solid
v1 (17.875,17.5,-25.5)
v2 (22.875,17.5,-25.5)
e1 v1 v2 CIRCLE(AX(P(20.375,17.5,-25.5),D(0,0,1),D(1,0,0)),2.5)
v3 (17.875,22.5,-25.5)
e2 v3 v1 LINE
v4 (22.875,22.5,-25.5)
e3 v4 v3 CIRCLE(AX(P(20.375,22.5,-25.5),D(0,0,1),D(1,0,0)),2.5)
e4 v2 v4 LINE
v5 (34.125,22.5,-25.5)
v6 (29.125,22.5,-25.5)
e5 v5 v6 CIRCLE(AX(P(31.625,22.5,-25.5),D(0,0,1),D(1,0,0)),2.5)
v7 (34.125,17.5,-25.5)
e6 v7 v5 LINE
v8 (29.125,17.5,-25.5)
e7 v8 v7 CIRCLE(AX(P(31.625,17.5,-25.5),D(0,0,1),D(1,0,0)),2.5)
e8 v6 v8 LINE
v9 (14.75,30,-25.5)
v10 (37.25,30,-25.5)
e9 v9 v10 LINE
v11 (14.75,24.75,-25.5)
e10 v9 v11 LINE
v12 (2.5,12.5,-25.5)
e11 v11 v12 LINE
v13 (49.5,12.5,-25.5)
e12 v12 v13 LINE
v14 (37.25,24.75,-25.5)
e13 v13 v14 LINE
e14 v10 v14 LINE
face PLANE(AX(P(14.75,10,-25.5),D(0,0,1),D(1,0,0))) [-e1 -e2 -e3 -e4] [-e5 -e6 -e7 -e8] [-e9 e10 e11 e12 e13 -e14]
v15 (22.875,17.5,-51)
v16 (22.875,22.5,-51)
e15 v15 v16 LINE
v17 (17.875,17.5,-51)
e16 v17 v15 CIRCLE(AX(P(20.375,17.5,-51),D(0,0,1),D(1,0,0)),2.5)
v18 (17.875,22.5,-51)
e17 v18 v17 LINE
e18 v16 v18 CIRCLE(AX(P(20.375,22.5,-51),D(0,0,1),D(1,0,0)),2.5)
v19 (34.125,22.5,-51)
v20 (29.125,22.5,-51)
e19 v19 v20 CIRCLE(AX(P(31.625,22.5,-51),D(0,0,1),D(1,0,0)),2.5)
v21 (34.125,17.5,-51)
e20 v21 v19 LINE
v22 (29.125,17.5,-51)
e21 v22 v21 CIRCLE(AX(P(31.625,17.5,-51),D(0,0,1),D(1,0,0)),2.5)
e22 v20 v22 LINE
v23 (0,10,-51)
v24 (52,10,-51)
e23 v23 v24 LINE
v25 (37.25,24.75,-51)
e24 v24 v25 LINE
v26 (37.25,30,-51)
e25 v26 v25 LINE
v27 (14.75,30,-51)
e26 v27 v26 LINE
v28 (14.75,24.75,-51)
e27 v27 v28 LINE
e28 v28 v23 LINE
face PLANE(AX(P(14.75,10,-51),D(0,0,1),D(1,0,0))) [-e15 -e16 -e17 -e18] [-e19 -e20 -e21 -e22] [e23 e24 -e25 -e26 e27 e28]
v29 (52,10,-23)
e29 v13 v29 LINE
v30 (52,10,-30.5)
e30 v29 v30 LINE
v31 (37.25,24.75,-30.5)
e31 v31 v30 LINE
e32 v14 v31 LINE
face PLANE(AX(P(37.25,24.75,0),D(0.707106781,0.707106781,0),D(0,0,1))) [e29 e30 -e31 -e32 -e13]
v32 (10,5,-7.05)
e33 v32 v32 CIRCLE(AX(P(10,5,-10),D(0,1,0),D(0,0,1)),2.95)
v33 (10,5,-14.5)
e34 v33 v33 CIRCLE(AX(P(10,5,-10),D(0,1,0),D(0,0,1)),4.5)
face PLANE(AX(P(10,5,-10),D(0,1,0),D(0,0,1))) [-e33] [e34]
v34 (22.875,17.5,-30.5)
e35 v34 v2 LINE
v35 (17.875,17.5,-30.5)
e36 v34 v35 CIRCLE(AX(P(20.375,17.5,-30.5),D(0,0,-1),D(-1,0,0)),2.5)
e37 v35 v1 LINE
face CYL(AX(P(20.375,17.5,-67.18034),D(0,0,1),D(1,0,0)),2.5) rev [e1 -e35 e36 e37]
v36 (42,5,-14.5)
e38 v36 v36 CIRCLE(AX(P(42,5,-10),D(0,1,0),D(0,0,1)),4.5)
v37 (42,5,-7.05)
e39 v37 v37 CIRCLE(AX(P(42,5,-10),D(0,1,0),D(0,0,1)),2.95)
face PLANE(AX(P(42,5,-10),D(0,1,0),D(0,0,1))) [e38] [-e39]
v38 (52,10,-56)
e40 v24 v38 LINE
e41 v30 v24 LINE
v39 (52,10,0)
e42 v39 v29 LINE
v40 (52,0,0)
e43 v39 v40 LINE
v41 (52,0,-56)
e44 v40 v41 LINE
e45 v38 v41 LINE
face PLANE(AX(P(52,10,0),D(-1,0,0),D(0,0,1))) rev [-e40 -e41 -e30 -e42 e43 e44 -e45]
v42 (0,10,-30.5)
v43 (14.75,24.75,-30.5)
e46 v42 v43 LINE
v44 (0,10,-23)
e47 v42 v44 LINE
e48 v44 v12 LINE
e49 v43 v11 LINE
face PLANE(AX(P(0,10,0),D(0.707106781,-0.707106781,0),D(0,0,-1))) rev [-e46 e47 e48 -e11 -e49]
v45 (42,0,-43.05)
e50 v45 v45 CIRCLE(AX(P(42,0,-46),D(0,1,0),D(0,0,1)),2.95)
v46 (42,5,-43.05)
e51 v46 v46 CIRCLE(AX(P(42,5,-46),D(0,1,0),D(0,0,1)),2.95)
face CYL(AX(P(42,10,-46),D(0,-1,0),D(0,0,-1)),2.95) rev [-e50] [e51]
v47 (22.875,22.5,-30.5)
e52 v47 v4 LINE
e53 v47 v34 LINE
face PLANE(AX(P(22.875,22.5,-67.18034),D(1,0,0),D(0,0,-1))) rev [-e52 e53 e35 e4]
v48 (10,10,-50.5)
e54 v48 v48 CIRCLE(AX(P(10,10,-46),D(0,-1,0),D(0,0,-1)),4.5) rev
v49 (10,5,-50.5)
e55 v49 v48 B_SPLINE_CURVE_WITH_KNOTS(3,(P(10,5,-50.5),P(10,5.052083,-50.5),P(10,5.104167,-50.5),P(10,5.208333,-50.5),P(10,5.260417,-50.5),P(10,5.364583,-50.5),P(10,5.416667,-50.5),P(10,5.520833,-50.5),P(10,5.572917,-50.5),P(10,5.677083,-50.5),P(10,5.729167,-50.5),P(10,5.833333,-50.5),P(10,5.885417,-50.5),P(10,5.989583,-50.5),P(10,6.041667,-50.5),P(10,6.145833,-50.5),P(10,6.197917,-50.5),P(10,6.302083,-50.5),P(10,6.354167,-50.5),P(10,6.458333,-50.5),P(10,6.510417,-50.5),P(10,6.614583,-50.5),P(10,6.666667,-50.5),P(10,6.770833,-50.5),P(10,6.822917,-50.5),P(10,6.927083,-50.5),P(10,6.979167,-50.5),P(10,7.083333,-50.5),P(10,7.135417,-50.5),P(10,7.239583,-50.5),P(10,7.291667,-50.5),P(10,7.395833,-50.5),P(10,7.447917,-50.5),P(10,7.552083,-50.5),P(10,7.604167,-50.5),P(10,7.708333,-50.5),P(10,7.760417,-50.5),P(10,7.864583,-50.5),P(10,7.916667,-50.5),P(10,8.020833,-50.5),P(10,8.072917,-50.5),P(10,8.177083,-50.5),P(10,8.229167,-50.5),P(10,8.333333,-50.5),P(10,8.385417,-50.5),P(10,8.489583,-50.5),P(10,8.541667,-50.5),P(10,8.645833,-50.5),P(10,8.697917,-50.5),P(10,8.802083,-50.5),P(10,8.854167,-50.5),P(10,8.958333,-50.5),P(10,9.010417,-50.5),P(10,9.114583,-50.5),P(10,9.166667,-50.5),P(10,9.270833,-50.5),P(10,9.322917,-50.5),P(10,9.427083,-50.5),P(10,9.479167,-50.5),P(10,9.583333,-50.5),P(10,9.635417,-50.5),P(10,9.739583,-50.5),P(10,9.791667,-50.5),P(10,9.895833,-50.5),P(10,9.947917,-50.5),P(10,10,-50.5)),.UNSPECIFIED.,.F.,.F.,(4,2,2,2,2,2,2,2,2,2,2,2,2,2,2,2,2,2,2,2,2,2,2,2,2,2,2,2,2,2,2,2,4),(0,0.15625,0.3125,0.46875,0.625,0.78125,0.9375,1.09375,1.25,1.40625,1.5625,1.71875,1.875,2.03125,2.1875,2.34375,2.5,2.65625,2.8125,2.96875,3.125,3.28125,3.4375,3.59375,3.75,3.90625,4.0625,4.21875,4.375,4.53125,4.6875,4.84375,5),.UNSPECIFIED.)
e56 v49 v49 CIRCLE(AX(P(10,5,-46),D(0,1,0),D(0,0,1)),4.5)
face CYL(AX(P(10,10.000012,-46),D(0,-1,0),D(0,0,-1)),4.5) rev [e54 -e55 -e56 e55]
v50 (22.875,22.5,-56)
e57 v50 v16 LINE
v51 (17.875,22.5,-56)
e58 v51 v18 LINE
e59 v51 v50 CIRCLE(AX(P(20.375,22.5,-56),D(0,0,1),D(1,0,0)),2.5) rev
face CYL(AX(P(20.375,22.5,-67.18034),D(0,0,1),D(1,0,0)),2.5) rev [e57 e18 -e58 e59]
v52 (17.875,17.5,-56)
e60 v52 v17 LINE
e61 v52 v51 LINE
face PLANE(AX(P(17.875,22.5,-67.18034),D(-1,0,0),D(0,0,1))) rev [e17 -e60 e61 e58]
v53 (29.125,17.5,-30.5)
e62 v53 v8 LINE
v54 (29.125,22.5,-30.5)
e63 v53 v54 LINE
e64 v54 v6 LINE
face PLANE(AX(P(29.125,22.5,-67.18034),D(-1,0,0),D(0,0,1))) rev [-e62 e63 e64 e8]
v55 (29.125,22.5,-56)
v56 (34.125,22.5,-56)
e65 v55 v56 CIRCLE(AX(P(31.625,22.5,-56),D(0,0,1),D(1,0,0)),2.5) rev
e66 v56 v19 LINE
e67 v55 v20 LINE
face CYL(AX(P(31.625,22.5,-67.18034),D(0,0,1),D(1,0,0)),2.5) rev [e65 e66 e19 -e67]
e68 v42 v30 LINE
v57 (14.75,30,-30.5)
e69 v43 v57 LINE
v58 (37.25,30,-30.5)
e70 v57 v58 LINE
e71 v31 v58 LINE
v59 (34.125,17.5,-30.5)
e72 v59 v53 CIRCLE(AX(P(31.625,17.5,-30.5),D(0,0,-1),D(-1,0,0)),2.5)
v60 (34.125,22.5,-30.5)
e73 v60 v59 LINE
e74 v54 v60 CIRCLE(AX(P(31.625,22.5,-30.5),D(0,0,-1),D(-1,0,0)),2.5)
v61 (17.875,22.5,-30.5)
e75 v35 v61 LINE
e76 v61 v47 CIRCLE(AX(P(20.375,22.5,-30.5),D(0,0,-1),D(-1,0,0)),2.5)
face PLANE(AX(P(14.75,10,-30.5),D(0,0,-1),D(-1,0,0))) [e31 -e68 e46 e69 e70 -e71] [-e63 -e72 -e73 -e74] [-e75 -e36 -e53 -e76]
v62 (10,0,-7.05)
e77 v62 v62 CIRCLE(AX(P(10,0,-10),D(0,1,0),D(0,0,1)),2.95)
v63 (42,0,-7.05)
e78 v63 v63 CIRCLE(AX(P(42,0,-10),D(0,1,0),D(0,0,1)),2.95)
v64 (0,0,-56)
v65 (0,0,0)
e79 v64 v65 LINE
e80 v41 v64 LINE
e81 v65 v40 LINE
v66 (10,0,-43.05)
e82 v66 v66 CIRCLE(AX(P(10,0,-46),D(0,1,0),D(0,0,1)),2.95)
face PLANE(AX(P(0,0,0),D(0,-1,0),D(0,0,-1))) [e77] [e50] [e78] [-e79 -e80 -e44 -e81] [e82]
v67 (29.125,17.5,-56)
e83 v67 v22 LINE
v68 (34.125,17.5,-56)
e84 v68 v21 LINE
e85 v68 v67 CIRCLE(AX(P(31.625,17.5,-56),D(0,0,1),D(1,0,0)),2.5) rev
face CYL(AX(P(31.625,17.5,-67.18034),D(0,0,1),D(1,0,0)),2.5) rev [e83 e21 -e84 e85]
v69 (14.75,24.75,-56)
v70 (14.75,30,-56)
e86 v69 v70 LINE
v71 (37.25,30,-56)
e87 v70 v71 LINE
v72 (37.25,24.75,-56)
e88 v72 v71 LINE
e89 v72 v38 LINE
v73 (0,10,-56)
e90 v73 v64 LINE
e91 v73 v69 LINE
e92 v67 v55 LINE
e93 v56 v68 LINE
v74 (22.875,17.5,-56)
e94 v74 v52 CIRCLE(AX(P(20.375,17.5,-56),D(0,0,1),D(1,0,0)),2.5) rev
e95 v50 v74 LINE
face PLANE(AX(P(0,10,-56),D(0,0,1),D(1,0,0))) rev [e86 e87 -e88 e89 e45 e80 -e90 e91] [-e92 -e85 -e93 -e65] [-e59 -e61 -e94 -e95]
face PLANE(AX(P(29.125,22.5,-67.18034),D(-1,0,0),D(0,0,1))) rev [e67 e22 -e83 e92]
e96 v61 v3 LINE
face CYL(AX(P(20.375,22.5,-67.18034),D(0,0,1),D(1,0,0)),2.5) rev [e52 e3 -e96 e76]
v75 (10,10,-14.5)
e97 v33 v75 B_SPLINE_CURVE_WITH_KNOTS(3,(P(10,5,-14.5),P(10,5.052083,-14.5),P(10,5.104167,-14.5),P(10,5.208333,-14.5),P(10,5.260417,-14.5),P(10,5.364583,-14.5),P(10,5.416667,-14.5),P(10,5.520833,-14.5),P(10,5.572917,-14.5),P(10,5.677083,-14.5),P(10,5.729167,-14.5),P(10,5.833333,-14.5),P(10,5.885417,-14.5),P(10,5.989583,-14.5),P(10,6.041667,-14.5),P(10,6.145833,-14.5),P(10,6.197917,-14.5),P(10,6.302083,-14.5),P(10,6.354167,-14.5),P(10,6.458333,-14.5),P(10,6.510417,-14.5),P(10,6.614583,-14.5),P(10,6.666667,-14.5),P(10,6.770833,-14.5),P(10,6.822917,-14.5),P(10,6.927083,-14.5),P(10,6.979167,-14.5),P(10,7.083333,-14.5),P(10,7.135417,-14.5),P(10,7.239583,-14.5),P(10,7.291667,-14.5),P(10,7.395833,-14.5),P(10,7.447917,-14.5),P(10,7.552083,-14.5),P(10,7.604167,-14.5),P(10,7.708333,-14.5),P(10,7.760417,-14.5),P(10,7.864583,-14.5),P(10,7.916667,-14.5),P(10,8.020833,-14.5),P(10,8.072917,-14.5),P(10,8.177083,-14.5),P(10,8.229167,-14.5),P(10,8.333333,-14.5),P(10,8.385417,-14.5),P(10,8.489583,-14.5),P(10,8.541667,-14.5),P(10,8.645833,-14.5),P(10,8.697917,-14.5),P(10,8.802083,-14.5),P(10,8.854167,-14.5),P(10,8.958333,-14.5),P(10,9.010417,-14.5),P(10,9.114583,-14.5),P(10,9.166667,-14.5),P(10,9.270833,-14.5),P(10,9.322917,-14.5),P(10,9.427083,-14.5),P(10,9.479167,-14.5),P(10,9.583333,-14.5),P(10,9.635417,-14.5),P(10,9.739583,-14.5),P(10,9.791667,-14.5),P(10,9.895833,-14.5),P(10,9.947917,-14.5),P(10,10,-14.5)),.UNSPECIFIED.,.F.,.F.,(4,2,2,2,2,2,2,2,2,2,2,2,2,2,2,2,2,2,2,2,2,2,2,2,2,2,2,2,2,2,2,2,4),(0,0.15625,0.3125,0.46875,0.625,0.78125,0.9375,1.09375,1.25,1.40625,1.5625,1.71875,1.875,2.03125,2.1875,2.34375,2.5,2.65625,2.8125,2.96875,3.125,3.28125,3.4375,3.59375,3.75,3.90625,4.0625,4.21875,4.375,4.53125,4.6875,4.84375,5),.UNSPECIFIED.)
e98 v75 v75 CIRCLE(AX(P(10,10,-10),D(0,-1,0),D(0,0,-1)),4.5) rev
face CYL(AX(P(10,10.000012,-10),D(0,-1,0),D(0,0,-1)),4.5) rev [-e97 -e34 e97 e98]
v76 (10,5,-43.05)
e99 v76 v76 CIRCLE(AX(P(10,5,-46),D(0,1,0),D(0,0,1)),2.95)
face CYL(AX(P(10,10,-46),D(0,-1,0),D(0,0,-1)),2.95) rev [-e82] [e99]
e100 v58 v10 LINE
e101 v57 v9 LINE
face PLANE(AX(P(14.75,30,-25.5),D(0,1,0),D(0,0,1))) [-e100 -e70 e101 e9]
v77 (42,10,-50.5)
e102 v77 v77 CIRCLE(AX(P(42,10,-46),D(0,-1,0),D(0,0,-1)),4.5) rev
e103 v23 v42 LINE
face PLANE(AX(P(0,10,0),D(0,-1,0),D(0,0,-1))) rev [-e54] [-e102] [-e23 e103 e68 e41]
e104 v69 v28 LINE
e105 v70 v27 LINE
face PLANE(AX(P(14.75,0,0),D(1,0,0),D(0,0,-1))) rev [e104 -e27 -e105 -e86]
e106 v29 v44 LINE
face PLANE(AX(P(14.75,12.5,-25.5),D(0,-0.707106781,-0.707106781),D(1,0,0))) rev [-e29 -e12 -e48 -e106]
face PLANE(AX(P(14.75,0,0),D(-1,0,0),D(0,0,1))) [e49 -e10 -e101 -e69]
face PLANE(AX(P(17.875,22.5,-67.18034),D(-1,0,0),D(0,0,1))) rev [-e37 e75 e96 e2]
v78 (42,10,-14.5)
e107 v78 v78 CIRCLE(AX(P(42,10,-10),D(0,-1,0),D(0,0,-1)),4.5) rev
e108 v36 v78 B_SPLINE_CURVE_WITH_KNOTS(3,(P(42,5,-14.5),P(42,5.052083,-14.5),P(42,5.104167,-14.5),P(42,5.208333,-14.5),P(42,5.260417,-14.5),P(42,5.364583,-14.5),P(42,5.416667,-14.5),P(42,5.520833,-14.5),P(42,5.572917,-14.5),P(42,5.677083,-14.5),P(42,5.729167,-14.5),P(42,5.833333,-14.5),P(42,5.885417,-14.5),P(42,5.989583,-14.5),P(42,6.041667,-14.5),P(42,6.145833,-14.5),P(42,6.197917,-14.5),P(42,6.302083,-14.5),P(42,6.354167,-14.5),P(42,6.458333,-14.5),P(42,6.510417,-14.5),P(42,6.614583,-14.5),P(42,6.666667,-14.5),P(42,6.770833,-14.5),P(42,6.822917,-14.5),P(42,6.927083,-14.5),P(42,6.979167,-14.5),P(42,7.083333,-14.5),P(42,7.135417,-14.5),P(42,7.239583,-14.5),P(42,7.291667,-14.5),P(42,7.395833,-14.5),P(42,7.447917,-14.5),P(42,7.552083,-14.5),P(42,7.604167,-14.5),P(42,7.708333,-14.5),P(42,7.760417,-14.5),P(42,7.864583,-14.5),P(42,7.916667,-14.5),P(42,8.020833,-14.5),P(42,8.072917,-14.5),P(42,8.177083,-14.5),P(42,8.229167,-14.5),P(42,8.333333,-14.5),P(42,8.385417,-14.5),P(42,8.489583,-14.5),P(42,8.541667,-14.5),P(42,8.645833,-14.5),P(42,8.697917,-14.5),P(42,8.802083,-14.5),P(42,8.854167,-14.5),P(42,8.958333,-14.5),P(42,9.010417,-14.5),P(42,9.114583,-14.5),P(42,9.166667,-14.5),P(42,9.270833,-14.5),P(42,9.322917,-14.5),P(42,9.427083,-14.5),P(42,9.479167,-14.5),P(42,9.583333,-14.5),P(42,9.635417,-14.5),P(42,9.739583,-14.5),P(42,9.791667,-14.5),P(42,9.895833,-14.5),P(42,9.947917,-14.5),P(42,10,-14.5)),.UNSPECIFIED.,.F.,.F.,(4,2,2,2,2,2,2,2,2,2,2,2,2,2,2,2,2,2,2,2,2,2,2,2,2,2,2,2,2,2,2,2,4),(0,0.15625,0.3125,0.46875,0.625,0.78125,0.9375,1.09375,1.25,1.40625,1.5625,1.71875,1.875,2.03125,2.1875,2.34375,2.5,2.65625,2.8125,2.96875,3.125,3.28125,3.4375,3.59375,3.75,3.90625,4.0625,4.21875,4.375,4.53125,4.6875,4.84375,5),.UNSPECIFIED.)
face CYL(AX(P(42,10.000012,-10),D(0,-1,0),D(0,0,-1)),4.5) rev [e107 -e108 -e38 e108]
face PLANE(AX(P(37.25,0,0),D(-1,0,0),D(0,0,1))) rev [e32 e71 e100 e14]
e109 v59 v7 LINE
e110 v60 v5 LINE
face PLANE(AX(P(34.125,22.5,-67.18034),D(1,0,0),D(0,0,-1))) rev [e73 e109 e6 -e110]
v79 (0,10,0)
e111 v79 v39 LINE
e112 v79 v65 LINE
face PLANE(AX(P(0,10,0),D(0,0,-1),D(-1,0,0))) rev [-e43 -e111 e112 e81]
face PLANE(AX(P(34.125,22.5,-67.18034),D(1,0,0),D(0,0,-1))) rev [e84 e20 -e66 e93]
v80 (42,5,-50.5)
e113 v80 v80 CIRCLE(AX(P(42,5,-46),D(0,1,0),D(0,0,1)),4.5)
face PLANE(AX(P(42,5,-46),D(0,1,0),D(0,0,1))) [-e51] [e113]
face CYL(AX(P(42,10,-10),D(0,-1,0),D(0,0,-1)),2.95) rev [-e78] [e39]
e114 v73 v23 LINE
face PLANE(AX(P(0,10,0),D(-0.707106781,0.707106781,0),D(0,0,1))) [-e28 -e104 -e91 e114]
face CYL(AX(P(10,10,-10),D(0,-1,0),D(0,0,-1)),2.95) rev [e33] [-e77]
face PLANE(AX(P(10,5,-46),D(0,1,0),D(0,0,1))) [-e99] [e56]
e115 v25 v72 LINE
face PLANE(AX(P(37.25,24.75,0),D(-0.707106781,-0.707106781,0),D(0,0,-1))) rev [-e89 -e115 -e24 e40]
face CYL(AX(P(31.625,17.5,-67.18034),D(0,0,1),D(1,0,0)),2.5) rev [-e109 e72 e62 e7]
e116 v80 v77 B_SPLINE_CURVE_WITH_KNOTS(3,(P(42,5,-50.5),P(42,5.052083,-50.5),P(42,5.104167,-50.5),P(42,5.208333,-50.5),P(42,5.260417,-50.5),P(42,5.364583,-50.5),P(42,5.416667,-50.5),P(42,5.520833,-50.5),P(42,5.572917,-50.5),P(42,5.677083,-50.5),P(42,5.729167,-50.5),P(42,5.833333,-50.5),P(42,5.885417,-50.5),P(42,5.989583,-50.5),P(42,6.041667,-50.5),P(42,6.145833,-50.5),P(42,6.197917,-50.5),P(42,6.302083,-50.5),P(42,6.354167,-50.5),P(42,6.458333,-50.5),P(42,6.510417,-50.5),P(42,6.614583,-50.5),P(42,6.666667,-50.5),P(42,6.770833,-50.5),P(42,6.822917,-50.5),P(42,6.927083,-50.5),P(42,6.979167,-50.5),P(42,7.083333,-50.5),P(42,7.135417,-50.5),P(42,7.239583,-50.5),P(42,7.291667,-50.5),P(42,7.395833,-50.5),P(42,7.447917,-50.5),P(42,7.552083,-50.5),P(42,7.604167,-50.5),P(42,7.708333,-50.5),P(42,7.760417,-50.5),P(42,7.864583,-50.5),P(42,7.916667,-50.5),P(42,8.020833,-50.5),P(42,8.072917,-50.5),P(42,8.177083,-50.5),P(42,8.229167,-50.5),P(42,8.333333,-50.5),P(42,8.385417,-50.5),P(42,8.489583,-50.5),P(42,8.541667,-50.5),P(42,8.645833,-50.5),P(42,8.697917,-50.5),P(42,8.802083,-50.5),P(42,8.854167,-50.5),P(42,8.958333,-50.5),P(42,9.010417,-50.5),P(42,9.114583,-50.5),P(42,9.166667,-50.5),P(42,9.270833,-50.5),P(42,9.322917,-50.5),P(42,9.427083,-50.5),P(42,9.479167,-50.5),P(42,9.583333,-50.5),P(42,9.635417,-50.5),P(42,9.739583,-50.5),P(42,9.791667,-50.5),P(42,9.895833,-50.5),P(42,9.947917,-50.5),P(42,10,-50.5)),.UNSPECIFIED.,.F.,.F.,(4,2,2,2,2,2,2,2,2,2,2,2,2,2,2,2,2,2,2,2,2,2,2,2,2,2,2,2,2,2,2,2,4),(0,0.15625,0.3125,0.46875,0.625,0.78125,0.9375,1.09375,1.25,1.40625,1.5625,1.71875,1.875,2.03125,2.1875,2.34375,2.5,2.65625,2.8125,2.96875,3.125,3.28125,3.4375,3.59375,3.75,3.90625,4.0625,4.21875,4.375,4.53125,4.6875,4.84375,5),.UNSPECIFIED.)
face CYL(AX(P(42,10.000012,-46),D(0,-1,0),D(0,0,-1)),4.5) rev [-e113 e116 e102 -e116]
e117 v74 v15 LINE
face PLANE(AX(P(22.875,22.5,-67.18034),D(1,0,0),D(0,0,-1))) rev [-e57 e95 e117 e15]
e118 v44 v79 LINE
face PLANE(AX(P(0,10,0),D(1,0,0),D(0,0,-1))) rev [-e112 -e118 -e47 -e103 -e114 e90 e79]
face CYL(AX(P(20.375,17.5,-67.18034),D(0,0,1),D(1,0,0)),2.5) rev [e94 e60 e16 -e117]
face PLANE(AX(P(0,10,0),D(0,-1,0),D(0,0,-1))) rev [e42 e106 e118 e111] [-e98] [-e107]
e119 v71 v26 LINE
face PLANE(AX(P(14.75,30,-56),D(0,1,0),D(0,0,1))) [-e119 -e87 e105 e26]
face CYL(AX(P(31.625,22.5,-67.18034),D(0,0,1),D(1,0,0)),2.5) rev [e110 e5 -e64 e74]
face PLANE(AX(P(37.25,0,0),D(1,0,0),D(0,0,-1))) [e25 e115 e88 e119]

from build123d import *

# Parameters (mm, degrees)
SKETCH1_W               = 52
SKETCH1_H               = 56
SKETCH1_R               = 2.95
BOSS_EXTRUDE1_DEPTH     = 10
CUT_EXTRUDE1_DEPTH      = 78.071395472
CUT_EXTRUDE1_DEPTH_BACK = 5
SKETCH2_R               = 4.5
BOSS_EXTRUDE2_START     = -14.75
SKETCH3_W               = 5
SKETCH3_H               = 20
BOSS_EXTRUDE2_DEPTH     = 22.5
CUT_EXTRUDE2_REACH      = 69.337
CHAMFER1_SIZE           = 14.75
CHAMFER2_SIZE           = 2.5


with BuildPart() as part:
    # Sketch1 → Boss-Extrude1 (new body)
    with BuildSketch(Plane(origin=(0, 0, 0), x_dir=(1, 0, 0), z_dir=(0, 1, 0))):
        with Locations((26, 28)):
            Rectangle(SKETCH1_W, SKETCH1_H)
        with Locations(Location((10, 46, 0), (0, 0, 270))):
            Circle(SKETCH1_R, mode=Mode.SUBTRACT)
        with Locations(Location((42, 46, 0), (0, 0, 270))):
            Circle(SKETCH1_R, mode=Mode.SUBTRACT)
        with Locations(Location((42, 10, 0), (0, 0, 270))):
            Circle(SKETCH1_R, mode=Mode.SUBTRACT)
        with Locations(Location((10, 10, 0), (0, 0, 270))):
            Circle(SKETCH1_R, mode=Mode.SUBTRACT)
    extrude(amount=BOSS_EXTRUDE1_DEPTH)

    # Sketch2 → Cut-Extrude1 (cut, two sides: drawn at the far end of the back side and taken through both)
    with BuildSketch(Plane(origin=(0, 10, 0), x_dir=(1, 0, 0), z_dir=(0, 1, 0)).offset(-CUT_EXTRUDE1_DEPTH_BACK)):
        with Locations(Location((10, 10, 0), (0, 0, 90))):
            Circle(SKETCH2_R)
        with Locations(Location((42, 10, 0), (0, 0, 90))):
            Circle(SKETCH2_R)
        with Locations(Location((42, 46, 0), (0, 0, 90))):
            Circle(SKETCH2_R)
        with Locations(Location((10, 46, 0), (0, 0, 90))):
            Circle(SKETCH2_R)
    extrude(amount=CUT_EXTRUDE1_DEPTH + CUT_EXTRUDE1_DEPTH_BACK, mode=Mode.SUBTRACT)

    # Sketch3 → Boss-Extrude2 (add)
    with BuildSketch(Plane(origin=(52, 0, 0), x_dir=(0, 0, -1), z_dir=(1, 0, 0)).offset(BOSS_EXTRUDE2_START)):
        with Locations((28, 20)):
            Rectangle(SKETCH3_W, SKETCH3_H)
        with Locations((53.5, 20)):
            Rectangle(SKETCH3_W, SKETCH3_H)
    extrude(amount=-BOSS_EXTRUDE2_DEPTH)

    # Cut-Extrude2: up to this face of the body (flat: up to its plane)
    cut_extrude2_end = Plane(part.part.faces().sort_by_distance((26, 11.958762887, -56))[0])
    # Sketch4 → Cut-Extrude2 (cut, up to the picked face)
    with BuildSketch(Plane.XY.offset(-25.5), mode=Mode.PRIVATE) as cut_extrude2_sk1:
        with BuildLine():
            Line((22.875, 22.5), (22.875, 17.5))
            ThreePointArc((22.875, 17.5), (20.375, 15), (17.875, 17.5))
            Line((17.875, 17.5), (17.875, 22.5))
            ThreePointArc((17.875, 22.5), (20.375, 25), (22.875, 22.5))
        make_face()
    cut_extrude2_tool1 = split(extrude(cut_extrude2_sk1.sketch, amount=-CUT_EXTRUDE2_REACH, mode=Mode.PRIVATE), bisect_by=cut_extrude2_end, keep=Keep.BOTH, mode=Mode.PRIVATE)
    # Sketch4 → Cut-Extrude2 (cut, up to the picked face)
    with BuildSketch(Plane.XY.offset(-25.5), mode=Mode.PRIVATE) as cut_extrude2_sk2:
        with BuildLine():
            Line((34.125, 22.5), (34.125, 17.5))
            ThreePointArc((34.125, 17.5), (31.625, 15), (29.125, 17.5))
            Line((29.125, 17.5), (29.125, 22.5))
            ThreePointArc((29.125, 22.5), (31.625, 25), (34.125, 22.5))
        make_face()
    cut_extrude2_tool2 = split(extrude(cut_extrude2_sk2.sketch, amount=-CUT_EXTRUDE2_REACH, mode=Mode.PRIVATE), bisect_by=cut_extrude2_end, keep=Keep.BOTH, mode=Mode.PRIVATE)
    add(cut_extrude2_tool1.solids().sort_by(Axis((20.375, 20, -25.5), (0, 0, -1)))[0], mode=Mode.SUBTRACT)
    add(cut_extrude2_tool2.solids().sort_by(Axis((31.625, 20, -25.5), (0, 0, -1)))[0], mode=Mode.SUBTRACT)

    # Chamfer1
    chamfer1_edges = [part.edges().sort_by_distance(p)[0] for p in [
        (37.25, 10, -53.5),
        (37.25, 10, -28),
        (14.75, 10, -53.5),
        (14.75, 10, -28),
    ]]
    chamfer(chamfer1_edges, length=CHAMFER1_SIZE - 0.0001)  # a hair under: the kernel refuses the full size

    # Chamfer2
    chamfer2_edges = [part.edges().sort_by_distance(p)[0] for p in [
        (26, 10, -25.5),
    ]]
    chamfer(chamfer2_edges, length=CHAMFER2_SIZE)


solid = part.part
